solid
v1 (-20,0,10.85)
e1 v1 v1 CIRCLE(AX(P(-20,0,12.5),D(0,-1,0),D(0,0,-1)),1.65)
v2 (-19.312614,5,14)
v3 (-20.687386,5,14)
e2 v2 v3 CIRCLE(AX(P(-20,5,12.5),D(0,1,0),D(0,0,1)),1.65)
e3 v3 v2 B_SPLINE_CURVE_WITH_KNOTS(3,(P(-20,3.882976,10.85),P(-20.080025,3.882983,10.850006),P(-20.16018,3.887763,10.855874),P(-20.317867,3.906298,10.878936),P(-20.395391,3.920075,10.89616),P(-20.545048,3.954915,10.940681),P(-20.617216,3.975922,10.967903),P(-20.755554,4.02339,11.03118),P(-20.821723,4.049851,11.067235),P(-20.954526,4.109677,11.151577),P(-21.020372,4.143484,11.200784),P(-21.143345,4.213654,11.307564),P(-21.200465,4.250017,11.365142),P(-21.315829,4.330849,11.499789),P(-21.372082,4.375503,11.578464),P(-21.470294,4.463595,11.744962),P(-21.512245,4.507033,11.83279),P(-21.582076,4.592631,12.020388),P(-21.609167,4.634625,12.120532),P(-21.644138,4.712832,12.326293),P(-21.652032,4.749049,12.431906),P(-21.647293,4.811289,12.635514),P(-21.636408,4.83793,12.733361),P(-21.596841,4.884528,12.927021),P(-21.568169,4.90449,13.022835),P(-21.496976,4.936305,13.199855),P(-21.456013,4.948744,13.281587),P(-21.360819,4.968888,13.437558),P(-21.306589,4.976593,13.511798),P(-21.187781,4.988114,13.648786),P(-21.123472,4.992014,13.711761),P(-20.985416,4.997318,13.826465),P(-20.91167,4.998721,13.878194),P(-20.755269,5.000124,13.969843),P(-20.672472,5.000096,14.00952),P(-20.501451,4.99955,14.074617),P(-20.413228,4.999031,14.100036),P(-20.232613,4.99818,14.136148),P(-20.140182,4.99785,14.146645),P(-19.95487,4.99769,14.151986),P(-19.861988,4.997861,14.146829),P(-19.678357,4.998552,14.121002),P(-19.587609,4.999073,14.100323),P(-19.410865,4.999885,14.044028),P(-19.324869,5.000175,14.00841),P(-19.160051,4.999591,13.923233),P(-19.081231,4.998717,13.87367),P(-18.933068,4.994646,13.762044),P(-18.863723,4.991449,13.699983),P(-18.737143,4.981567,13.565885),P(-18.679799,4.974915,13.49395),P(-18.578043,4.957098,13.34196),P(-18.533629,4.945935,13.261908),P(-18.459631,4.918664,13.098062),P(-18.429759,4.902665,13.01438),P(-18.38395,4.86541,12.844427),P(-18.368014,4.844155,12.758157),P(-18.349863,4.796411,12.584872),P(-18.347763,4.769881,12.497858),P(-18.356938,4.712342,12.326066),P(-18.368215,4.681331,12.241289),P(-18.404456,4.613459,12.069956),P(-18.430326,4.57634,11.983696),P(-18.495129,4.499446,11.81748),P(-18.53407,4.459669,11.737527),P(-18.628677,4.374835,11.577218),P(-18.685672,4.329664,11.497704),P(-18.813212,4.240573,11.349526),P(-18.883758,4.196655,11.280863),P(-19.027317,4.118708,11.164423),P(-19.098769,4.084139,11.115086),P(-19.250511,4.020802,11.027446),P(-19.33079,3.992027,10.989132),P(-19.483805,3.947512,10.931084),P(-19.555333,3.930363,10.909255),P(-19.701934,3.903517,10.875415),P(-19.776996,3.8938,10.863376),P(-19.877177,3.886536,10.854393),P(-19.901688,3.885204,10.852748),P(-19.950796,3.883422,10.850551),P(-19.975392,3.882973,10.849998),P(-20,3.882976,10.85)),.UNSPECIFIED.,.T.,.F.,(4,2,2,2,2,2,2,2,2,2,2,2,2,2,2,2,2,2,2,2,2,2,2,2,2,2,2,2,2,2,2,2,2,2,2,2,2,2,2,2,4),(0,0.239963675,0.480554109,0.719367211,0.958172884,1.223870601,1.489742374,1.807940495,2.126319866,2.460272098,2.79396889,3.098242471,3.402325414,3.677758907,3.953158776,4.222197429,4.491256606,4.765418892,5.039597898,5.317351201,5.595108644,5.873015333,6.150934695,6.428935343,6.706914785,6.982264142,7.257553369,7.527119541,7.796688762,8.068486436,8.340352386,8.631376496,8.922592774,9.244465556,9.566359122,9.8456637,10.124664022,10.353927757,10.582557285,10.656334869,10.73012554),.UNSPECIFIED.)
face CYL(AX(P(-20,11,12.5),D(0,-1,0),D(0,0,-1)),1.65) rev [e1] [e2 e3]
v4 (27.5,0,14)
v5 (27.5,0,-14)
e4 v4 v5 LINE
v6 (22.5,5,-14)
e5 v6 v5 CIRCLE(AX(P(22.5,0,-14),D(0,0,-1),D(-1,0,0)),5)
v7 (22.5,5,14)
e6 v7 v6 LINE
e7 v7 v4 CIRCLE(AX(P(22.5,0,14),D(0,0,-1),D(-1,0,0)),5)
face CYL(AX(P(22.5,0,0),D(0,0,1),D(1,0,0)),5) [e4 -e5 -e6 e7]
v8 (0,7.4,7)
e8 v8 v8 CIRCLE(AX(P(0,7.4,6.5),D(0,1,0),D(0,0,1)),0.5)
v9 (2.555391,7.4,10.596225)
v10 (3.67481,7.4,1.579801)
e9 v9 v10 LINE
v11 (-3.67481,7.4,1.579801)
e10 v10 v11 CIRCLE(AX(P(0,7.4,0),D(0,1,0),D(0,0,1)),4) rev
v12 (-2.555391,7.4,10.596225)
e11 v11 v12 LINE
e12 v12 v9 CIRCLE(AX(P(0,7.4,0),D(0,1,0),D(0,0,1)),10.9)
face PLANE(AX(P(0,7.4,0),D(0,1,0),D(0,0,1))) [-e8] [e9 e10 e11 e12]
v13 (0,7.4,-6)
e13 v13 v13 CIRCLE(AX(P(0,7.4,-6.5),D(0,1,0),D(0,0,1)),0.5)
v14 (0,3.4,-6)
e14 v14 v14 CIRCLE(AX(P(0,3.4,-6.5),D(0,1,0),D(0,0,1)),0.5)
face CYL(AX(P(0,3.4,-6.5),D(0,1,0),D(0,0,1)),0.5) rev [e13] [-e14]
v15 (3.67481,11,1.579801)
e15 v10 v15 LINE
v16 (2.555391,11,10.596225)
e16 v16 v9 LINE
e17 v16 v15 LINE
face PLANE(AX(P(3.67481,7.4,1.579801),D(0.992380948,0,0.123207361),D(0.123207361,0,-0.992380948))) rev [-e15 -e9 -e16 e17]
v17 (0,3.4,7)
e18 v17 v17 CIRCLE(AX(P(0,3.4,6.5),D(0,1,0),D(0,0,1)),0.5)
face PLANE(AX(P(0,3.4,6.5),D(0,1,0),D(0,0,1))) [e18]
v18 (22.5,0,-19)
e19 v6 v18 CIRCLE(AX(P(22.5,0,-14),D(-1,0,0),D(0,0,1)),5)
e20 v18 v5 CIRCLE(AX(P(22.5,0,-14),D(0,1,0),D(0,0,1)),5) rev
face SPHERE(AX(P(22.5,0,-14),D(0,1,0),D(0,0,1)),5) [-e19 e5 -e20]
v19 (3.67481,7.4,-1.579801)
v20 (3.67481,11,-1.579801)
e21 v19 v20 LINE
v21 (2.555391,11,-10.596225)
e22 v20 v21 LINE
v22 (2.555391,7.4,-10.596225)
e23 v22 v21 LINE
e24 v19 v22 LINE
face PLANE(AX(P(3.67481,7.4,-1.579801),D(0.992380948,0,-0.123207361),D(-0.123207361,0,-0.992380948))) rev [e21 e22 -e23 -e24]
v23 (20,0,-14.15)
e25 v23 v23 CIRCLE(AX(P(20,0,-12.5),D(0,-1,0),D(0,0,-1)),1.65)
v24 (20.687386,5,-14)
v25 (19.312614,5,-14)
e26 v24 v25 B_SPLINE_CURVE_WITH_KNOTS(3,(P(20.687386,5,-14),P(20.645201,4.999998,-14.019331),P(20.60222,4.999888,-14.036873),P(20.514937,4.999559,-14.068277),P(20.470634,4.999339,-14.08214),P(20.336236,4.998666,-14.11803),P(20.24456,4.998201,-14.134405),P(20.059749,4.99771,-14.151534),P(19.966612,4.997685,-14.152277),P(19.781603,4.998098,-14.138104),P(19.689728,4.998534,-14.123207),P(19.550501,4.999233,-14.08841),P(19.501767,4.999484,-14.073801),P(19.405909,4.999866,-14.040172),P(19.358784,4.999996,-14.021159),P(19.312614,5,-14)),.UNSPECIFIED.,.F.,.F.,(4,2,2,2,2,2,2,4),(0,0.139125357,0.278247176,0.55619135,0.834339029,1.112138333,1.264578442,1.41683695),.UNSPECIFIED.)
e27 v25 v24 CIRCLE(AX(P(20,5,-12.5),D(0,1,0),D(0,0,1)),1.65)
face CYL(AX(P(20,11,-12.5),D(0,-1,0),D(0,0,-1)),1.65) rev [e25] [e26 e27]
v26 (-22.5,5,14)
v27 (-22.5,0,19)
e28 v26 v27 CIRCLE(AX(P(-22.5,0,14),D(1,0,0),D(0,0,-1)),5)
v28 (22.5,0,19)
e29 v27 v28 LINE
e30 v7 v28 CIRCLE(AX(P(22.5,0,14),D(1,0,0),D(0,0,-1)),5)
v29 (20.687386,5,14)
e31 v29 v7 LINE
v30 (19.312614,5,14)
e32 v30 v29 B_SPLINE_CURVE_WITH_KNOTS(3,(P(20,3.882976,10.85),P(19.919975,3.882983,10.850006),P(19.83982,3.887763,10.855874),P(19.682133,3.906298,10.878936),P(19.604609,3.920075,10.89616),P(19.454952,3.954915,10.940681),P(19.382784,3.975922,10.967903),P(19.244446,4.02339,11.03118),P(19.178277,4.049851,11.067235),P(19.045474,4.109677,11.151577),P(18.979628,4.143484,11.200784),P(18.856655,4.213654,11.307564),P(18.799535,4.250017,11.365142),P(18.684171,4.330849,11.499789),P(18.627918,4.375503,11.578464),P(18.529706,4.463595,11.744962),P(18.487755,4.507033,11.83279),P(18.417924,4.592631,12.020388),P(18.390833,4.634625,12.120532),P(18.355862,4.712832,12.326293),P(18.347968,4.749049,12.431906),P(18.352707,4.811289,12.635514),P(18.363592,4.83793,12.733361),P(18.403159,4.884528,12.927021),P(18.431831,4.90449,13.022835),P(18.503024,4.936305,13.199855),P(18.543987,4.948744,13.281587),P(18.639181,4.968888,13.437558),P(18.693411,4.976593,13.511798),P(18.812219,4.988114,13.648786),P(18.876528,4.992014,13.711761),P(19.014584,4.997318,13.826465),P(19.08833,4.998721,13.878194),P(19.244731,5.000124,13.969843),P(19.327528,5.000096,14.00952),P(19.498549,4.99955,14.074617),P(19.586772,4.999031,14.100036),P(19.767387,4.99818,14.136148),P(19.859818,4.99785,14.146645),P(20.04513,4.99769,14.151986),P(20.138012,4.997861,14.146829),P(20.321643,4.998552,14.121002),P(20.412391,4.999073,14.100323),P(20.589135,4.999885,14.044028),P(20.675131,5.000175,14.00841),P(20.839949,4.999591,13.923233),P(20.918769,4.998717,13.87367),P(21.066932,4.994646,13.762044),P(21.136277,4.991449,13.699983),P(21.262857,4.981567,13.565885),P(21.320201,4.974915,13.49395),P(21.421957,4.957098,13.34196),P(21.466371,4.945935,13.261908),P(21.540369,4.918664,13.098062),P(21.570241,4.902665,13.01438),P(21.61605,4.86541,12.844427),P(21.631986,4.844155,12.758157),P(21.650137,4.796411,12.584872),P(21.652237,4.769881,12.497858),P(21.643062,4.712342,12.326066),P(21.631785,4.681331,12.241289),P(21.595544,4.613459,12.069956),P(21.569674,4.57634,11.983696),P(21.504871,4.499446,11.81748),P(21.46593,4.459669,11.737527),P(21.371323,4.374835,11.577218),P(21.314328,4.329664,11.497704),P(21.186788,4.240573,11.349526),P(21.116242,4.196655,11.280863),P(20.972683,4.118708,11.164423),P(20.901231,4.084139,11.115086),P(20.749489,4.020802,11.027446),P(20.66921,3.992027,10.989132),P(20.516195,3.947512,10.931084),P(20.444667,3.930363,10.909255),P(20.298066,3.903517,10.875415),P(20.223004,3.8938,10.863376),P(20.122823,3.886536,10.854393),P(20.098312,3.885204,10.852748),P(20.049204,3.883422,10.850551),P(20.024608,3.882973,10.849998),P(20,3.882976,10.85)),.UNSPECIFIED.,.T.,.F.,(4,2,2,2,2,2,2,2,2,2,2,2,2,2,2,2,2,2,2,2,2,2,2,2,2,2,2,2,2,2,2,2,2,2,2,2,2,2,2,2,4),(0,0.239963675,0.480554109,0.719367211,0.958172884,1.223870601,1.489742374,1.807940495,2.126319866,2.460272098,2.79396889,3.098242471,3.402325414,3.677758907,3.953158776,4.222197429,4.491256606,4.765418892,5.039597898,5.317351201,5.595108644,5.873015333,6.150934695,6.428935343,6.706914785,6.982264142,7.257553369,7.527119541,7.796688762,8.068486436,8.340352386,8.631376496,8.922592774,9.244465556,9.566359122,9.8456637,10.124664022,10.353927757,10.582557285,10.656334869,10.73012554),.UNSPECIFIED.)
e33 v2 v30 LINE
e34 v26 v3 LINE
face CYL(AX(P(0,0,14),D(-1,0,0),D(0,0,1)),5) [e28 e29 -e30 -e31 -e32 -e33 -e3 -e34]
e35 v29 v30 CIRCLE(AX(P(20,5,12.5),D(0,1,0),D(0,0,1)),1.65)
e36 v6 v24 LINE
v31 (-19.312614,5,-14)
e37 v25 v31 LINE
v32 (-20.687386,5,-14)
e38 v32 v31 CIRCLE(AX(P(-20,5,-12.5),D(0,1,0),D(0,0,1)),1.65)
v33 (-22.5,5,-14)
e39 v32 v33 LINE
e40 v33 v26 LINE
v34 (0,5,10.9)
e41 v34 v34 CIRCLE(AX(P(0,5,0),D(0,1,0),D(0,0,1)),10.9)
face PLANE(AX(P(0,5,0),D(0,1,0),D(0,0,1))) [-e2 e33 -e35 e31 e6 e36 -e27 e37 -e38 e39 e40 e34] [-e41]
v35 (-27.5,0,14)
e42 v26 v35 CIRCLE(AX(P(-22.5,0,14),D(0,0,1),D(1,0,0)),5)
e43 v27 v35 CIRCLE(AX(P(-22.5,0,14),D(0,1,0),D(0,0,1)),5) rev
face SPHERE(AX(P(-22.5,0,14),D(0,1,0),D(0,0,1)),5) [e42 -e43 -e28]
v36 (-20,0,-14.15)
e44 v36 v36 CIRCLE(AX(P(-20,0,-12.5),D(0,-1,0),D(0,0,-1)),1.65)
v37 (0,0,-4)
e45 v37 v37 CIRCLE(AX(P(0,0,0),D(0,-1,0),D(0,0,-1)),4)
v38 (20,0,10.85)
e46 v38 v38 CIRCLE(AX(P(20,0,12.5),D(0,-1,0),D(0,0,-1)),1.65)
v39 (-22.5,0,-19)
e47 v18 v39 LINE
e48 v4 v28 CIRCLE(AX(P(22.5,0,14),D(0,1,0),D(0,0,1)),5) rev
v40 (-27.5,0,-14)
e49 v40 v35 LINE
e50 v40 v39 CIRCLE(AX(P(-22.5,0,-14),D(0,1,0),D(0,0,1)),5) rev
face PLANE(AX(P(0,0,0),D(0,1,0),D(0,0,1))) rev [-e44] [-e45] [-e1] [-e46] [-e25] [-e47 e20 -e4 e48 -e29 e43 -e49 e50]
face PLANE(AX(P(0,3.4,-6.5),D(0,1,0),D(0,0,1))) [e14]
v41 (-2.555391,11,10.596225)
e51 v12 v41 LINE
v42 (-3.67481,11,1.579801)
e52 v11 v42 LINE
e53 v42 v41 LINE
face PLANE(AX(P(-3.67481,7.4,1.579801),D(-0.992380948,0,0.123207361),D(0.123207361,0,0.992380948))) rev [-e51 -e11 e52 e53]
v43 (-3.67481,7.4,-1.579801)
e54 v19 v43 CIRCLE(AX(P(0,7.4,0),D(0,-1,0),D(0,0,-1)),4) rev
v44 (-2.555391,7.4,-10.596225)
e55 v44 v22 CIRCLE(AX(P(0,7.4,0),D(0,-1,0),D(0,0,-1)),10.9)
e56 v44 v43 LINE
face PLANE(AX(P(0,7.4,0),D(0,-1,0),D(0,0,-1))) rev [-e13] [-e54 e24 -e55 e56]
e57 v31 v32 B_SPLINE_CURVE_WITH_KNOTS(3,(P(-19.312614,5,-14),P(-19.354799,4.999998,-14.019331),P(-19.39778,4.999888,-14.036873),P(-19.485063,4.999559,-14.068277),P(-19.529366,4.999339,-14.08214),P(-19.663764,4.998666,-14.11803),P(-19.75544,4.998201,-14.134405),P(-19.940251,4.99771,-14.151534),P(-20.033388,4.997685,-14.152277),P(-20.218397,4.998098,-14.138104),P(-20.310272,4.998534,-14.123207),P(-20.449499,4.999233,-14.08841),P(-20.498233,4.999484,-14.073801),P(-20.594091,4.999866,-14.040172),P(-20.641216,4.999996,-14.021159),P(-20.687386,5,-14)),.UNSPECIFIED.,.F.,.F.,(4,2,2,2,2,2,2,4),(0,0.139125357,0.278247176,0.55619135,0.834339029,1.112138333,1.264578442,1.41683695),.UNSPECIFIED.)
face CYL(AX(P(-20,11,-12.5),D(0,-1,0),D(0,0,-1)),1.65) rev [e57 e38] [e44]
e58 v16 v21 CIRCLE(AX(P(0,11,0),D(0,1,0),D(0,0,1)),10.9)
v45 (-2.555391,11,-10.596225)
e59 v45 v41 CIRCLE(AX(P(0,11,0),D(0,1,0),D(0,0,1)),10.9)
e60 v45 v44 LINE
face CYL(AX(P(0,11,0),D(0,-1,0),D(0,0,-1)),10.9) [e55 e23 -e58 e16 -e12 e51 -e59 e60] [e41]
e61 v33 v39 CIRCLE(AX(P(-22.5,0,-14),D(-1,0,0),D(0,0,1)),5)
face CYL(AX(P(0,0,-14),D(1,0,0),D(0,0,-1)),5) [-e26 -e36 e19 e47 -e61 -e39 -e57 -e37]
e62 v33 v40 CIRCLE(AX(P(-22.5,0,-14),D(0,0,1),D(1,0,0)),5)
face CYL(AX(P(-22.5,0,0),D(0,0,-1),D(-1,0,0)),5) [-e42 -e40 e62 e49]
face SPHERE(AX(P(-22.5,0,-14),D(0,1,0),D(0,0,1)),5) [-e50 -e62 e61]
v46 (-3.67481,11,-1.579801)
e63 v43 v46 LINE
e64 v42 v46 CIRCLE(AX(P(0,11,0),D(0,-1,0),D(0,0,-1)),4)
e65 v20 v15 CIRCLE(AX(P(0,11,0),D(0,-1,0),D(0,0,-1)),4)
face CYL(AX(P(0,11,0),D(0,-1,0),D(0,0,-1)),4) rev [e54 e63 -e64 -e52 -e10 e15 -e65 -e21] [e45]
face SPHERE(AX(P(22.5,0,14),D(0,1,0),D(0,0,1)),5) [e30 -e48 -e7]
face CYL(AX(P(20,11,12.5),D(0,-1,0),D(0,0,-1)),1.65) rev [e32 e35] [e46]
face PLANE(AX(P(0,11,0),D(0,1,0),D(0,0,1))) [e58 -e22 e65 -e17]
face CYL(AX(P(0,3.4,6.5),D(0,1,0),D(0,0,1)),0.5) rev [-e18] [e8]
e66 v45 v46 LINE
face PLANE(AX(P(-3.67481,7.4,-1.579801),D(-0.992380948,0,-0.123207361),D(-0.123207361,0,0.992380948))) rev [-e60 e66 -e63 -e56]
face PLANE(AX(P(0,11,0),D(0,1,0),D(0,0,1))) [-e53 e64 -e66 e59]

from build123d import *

# Parameters (mm, degrees)
SKETCH_1_W          = 55
SKETCH_1_H          = 38
EXTRUDE_1_DEPTH     = 5
SKETCH_2_R          = 10.9
EXTRUDE_2_DEPTH     = 6
SKETCH_3_R          = 4
CUT_EXTRUDE_1_DEPTH = 36.18877662
CUT_EXTRUDE_2_DEPTH = 3.6
SKETCH_5_R          = 0.5
CUT_EXTRUDE_3_DEPTH = 4
FILLET_1_R          = 5
FILLET_2_R          = 5
FILLET_3_R          = 5
FILLET_4_R          = 5
FILLET_5_R          = 5
SKETCH_6_R          = 1.65
CUT_EXTRUDE_4_DEPTH = 36.18877662


with BuildPart() as part:
    # 草图1 → 凸台-拉伸1 (new body)
    with BuildSketch(Plane(origin=(0, 0, 0), x_dir=(1, 0, 0), z_dir=(0, 1, 0))):
        Rectangle(SKETCH_1_W, SKETCH_1_H)
    extrude(amount=EXTRUDE_1_DEPTH)

    # 草图2 → 凸台-拉伸2 (add)
    with BuildSketch(Plane(origin=(0, 5, 0), x_dir=(1, 0, 0), z_dir=(0, 1, 0))):
        with Locations(Location((0, 0, 0), (0, 0, 270))):
            Circle(SKETCH_2_R)
    extrude(amount=EXTRUDE_2_DEPTH)

    # 草图3 → 切除-拉伸1 (cut, through all)
    with BuildSketch(Plane.XZ):
        with Locations(Location((0, 0, 0), (0, 0, 270))):
            Circle(SKETCH_3_R)
    extrude(amount=-CUT_EXTRUDE_1_DEPTH, mode=Mode.SUBTRACT)

    # 草图4 → 切除-拉伸2 (cut)
    with BuildSketch(Plane(origin=(0, 11, 0), x_dir=(1, 0, 0), z_dir=(0, 1, 0))):
        Polygon((3.674809939, -1.579801226), (2.341337155, -12.320336373), (-2.341337155, -12.320336373), (-3.674809939, -1.579801226), align=None)
        Polygon((-3.674809939, 1.579801226), (-2.341337155, 12.320336373), (2.341337155, 12.320336373), (3.674809939, 1.579801226), align=None)
    extrude(amount=-CUT_EXTRUDE_2_DEPTH, mode=Mode.SUBTRACT)

    # 草图5 → 切除-拉伸3 (cut)
    with BuildSketch(Plane(origin=(0, 7.4, 0), x_dir=(1, 0, 0), z_dir=(0, 1, 0))):
        with Locations(Location((0, -6.5, 0), (0, 0, 270))):
            Circle(SKETCH_5_R)
        with Locations(Location((0, 6.5, 0), (0, 0, 270))):
            Circle(SKETCH_5_R)
    extrude(amount=-CUT_EXTRUDE_3_DEPTH, mode=Mode.SUBTRACT)

    # 圆角1
    fillet_1_edges = [part.edges().sort_by_distance(p)[0] for p in [
        (27.5, 2.5, 19),
    ]]
    fillet(fillet_1_edges, radius=FILLET_1_R)

    # 圆角2
    fillet_2_edges = [part.edges().sort_by_distance(p)[0] for p in [
        (-27.5, 2.5, 19),
    ]]
    fillet(fillet_2_edges, radius=FILLET_2_R)

    # 圆角3
    fillet_3_edges = [part.edges().sort_by_distance(p)[0] for p in [
        (-27.5, 2.5, -19),
    ]]
    fillet(fillet_3_edges, radius=FILLET_3_R)

    # 圆角4
    fillet_4_edges = [part.edges().sort_by_distance(p)[0] for p in [
        (27.5, 2.5, -19),
    ]]
    fillet(fillet_4_edges, radius=FILLET_4_R)

    # 圆角5
    fillet_5_edges = [part.edges().sort_by_distance(p)[0] for p in [
        (27.5, 5, 0),
        (0, 5, 19),
        (-27.5, 5, 0),
        (0, 5, -19),
        (26.035533906, 5, 17.535533906),
        (-26.035533906, 5, 17.535533906),
        (-26.035533906, 5, -17.535533906),
        (26.035533906, 5, -17.535533906),
    ]]
    fillet(fillet_5_edges, radius=FILLET_5_R - 0.0001)  # a hair under: the kernel refuses the full size

    # 草图6 → 切除-拉伸4 (cut, through all)
    with BuildSketch(Plane.XZ):
        with Locations(Location((-20, 12.5, 0), (0, 0, 270))):
            Circle(SKETCH_6_R)
        with Locations(Location((20, 12.5, 0), (0, 0, 270))):
            Circle(SKETCH_6_R)
        with Locations(Location((20, -12.5, 0), (0, 0, 270))):
            Circle(SKETCH_6_R)
        with Locations(Location((-20, -12.5, 0), (0, 0, 270))):
            Circle(SKETCH_6_R)
    extrude(amount=-CUT_EXTRUDE_4_DEPTH, mode=Mode.SUBTRACT)


solid = part.part
